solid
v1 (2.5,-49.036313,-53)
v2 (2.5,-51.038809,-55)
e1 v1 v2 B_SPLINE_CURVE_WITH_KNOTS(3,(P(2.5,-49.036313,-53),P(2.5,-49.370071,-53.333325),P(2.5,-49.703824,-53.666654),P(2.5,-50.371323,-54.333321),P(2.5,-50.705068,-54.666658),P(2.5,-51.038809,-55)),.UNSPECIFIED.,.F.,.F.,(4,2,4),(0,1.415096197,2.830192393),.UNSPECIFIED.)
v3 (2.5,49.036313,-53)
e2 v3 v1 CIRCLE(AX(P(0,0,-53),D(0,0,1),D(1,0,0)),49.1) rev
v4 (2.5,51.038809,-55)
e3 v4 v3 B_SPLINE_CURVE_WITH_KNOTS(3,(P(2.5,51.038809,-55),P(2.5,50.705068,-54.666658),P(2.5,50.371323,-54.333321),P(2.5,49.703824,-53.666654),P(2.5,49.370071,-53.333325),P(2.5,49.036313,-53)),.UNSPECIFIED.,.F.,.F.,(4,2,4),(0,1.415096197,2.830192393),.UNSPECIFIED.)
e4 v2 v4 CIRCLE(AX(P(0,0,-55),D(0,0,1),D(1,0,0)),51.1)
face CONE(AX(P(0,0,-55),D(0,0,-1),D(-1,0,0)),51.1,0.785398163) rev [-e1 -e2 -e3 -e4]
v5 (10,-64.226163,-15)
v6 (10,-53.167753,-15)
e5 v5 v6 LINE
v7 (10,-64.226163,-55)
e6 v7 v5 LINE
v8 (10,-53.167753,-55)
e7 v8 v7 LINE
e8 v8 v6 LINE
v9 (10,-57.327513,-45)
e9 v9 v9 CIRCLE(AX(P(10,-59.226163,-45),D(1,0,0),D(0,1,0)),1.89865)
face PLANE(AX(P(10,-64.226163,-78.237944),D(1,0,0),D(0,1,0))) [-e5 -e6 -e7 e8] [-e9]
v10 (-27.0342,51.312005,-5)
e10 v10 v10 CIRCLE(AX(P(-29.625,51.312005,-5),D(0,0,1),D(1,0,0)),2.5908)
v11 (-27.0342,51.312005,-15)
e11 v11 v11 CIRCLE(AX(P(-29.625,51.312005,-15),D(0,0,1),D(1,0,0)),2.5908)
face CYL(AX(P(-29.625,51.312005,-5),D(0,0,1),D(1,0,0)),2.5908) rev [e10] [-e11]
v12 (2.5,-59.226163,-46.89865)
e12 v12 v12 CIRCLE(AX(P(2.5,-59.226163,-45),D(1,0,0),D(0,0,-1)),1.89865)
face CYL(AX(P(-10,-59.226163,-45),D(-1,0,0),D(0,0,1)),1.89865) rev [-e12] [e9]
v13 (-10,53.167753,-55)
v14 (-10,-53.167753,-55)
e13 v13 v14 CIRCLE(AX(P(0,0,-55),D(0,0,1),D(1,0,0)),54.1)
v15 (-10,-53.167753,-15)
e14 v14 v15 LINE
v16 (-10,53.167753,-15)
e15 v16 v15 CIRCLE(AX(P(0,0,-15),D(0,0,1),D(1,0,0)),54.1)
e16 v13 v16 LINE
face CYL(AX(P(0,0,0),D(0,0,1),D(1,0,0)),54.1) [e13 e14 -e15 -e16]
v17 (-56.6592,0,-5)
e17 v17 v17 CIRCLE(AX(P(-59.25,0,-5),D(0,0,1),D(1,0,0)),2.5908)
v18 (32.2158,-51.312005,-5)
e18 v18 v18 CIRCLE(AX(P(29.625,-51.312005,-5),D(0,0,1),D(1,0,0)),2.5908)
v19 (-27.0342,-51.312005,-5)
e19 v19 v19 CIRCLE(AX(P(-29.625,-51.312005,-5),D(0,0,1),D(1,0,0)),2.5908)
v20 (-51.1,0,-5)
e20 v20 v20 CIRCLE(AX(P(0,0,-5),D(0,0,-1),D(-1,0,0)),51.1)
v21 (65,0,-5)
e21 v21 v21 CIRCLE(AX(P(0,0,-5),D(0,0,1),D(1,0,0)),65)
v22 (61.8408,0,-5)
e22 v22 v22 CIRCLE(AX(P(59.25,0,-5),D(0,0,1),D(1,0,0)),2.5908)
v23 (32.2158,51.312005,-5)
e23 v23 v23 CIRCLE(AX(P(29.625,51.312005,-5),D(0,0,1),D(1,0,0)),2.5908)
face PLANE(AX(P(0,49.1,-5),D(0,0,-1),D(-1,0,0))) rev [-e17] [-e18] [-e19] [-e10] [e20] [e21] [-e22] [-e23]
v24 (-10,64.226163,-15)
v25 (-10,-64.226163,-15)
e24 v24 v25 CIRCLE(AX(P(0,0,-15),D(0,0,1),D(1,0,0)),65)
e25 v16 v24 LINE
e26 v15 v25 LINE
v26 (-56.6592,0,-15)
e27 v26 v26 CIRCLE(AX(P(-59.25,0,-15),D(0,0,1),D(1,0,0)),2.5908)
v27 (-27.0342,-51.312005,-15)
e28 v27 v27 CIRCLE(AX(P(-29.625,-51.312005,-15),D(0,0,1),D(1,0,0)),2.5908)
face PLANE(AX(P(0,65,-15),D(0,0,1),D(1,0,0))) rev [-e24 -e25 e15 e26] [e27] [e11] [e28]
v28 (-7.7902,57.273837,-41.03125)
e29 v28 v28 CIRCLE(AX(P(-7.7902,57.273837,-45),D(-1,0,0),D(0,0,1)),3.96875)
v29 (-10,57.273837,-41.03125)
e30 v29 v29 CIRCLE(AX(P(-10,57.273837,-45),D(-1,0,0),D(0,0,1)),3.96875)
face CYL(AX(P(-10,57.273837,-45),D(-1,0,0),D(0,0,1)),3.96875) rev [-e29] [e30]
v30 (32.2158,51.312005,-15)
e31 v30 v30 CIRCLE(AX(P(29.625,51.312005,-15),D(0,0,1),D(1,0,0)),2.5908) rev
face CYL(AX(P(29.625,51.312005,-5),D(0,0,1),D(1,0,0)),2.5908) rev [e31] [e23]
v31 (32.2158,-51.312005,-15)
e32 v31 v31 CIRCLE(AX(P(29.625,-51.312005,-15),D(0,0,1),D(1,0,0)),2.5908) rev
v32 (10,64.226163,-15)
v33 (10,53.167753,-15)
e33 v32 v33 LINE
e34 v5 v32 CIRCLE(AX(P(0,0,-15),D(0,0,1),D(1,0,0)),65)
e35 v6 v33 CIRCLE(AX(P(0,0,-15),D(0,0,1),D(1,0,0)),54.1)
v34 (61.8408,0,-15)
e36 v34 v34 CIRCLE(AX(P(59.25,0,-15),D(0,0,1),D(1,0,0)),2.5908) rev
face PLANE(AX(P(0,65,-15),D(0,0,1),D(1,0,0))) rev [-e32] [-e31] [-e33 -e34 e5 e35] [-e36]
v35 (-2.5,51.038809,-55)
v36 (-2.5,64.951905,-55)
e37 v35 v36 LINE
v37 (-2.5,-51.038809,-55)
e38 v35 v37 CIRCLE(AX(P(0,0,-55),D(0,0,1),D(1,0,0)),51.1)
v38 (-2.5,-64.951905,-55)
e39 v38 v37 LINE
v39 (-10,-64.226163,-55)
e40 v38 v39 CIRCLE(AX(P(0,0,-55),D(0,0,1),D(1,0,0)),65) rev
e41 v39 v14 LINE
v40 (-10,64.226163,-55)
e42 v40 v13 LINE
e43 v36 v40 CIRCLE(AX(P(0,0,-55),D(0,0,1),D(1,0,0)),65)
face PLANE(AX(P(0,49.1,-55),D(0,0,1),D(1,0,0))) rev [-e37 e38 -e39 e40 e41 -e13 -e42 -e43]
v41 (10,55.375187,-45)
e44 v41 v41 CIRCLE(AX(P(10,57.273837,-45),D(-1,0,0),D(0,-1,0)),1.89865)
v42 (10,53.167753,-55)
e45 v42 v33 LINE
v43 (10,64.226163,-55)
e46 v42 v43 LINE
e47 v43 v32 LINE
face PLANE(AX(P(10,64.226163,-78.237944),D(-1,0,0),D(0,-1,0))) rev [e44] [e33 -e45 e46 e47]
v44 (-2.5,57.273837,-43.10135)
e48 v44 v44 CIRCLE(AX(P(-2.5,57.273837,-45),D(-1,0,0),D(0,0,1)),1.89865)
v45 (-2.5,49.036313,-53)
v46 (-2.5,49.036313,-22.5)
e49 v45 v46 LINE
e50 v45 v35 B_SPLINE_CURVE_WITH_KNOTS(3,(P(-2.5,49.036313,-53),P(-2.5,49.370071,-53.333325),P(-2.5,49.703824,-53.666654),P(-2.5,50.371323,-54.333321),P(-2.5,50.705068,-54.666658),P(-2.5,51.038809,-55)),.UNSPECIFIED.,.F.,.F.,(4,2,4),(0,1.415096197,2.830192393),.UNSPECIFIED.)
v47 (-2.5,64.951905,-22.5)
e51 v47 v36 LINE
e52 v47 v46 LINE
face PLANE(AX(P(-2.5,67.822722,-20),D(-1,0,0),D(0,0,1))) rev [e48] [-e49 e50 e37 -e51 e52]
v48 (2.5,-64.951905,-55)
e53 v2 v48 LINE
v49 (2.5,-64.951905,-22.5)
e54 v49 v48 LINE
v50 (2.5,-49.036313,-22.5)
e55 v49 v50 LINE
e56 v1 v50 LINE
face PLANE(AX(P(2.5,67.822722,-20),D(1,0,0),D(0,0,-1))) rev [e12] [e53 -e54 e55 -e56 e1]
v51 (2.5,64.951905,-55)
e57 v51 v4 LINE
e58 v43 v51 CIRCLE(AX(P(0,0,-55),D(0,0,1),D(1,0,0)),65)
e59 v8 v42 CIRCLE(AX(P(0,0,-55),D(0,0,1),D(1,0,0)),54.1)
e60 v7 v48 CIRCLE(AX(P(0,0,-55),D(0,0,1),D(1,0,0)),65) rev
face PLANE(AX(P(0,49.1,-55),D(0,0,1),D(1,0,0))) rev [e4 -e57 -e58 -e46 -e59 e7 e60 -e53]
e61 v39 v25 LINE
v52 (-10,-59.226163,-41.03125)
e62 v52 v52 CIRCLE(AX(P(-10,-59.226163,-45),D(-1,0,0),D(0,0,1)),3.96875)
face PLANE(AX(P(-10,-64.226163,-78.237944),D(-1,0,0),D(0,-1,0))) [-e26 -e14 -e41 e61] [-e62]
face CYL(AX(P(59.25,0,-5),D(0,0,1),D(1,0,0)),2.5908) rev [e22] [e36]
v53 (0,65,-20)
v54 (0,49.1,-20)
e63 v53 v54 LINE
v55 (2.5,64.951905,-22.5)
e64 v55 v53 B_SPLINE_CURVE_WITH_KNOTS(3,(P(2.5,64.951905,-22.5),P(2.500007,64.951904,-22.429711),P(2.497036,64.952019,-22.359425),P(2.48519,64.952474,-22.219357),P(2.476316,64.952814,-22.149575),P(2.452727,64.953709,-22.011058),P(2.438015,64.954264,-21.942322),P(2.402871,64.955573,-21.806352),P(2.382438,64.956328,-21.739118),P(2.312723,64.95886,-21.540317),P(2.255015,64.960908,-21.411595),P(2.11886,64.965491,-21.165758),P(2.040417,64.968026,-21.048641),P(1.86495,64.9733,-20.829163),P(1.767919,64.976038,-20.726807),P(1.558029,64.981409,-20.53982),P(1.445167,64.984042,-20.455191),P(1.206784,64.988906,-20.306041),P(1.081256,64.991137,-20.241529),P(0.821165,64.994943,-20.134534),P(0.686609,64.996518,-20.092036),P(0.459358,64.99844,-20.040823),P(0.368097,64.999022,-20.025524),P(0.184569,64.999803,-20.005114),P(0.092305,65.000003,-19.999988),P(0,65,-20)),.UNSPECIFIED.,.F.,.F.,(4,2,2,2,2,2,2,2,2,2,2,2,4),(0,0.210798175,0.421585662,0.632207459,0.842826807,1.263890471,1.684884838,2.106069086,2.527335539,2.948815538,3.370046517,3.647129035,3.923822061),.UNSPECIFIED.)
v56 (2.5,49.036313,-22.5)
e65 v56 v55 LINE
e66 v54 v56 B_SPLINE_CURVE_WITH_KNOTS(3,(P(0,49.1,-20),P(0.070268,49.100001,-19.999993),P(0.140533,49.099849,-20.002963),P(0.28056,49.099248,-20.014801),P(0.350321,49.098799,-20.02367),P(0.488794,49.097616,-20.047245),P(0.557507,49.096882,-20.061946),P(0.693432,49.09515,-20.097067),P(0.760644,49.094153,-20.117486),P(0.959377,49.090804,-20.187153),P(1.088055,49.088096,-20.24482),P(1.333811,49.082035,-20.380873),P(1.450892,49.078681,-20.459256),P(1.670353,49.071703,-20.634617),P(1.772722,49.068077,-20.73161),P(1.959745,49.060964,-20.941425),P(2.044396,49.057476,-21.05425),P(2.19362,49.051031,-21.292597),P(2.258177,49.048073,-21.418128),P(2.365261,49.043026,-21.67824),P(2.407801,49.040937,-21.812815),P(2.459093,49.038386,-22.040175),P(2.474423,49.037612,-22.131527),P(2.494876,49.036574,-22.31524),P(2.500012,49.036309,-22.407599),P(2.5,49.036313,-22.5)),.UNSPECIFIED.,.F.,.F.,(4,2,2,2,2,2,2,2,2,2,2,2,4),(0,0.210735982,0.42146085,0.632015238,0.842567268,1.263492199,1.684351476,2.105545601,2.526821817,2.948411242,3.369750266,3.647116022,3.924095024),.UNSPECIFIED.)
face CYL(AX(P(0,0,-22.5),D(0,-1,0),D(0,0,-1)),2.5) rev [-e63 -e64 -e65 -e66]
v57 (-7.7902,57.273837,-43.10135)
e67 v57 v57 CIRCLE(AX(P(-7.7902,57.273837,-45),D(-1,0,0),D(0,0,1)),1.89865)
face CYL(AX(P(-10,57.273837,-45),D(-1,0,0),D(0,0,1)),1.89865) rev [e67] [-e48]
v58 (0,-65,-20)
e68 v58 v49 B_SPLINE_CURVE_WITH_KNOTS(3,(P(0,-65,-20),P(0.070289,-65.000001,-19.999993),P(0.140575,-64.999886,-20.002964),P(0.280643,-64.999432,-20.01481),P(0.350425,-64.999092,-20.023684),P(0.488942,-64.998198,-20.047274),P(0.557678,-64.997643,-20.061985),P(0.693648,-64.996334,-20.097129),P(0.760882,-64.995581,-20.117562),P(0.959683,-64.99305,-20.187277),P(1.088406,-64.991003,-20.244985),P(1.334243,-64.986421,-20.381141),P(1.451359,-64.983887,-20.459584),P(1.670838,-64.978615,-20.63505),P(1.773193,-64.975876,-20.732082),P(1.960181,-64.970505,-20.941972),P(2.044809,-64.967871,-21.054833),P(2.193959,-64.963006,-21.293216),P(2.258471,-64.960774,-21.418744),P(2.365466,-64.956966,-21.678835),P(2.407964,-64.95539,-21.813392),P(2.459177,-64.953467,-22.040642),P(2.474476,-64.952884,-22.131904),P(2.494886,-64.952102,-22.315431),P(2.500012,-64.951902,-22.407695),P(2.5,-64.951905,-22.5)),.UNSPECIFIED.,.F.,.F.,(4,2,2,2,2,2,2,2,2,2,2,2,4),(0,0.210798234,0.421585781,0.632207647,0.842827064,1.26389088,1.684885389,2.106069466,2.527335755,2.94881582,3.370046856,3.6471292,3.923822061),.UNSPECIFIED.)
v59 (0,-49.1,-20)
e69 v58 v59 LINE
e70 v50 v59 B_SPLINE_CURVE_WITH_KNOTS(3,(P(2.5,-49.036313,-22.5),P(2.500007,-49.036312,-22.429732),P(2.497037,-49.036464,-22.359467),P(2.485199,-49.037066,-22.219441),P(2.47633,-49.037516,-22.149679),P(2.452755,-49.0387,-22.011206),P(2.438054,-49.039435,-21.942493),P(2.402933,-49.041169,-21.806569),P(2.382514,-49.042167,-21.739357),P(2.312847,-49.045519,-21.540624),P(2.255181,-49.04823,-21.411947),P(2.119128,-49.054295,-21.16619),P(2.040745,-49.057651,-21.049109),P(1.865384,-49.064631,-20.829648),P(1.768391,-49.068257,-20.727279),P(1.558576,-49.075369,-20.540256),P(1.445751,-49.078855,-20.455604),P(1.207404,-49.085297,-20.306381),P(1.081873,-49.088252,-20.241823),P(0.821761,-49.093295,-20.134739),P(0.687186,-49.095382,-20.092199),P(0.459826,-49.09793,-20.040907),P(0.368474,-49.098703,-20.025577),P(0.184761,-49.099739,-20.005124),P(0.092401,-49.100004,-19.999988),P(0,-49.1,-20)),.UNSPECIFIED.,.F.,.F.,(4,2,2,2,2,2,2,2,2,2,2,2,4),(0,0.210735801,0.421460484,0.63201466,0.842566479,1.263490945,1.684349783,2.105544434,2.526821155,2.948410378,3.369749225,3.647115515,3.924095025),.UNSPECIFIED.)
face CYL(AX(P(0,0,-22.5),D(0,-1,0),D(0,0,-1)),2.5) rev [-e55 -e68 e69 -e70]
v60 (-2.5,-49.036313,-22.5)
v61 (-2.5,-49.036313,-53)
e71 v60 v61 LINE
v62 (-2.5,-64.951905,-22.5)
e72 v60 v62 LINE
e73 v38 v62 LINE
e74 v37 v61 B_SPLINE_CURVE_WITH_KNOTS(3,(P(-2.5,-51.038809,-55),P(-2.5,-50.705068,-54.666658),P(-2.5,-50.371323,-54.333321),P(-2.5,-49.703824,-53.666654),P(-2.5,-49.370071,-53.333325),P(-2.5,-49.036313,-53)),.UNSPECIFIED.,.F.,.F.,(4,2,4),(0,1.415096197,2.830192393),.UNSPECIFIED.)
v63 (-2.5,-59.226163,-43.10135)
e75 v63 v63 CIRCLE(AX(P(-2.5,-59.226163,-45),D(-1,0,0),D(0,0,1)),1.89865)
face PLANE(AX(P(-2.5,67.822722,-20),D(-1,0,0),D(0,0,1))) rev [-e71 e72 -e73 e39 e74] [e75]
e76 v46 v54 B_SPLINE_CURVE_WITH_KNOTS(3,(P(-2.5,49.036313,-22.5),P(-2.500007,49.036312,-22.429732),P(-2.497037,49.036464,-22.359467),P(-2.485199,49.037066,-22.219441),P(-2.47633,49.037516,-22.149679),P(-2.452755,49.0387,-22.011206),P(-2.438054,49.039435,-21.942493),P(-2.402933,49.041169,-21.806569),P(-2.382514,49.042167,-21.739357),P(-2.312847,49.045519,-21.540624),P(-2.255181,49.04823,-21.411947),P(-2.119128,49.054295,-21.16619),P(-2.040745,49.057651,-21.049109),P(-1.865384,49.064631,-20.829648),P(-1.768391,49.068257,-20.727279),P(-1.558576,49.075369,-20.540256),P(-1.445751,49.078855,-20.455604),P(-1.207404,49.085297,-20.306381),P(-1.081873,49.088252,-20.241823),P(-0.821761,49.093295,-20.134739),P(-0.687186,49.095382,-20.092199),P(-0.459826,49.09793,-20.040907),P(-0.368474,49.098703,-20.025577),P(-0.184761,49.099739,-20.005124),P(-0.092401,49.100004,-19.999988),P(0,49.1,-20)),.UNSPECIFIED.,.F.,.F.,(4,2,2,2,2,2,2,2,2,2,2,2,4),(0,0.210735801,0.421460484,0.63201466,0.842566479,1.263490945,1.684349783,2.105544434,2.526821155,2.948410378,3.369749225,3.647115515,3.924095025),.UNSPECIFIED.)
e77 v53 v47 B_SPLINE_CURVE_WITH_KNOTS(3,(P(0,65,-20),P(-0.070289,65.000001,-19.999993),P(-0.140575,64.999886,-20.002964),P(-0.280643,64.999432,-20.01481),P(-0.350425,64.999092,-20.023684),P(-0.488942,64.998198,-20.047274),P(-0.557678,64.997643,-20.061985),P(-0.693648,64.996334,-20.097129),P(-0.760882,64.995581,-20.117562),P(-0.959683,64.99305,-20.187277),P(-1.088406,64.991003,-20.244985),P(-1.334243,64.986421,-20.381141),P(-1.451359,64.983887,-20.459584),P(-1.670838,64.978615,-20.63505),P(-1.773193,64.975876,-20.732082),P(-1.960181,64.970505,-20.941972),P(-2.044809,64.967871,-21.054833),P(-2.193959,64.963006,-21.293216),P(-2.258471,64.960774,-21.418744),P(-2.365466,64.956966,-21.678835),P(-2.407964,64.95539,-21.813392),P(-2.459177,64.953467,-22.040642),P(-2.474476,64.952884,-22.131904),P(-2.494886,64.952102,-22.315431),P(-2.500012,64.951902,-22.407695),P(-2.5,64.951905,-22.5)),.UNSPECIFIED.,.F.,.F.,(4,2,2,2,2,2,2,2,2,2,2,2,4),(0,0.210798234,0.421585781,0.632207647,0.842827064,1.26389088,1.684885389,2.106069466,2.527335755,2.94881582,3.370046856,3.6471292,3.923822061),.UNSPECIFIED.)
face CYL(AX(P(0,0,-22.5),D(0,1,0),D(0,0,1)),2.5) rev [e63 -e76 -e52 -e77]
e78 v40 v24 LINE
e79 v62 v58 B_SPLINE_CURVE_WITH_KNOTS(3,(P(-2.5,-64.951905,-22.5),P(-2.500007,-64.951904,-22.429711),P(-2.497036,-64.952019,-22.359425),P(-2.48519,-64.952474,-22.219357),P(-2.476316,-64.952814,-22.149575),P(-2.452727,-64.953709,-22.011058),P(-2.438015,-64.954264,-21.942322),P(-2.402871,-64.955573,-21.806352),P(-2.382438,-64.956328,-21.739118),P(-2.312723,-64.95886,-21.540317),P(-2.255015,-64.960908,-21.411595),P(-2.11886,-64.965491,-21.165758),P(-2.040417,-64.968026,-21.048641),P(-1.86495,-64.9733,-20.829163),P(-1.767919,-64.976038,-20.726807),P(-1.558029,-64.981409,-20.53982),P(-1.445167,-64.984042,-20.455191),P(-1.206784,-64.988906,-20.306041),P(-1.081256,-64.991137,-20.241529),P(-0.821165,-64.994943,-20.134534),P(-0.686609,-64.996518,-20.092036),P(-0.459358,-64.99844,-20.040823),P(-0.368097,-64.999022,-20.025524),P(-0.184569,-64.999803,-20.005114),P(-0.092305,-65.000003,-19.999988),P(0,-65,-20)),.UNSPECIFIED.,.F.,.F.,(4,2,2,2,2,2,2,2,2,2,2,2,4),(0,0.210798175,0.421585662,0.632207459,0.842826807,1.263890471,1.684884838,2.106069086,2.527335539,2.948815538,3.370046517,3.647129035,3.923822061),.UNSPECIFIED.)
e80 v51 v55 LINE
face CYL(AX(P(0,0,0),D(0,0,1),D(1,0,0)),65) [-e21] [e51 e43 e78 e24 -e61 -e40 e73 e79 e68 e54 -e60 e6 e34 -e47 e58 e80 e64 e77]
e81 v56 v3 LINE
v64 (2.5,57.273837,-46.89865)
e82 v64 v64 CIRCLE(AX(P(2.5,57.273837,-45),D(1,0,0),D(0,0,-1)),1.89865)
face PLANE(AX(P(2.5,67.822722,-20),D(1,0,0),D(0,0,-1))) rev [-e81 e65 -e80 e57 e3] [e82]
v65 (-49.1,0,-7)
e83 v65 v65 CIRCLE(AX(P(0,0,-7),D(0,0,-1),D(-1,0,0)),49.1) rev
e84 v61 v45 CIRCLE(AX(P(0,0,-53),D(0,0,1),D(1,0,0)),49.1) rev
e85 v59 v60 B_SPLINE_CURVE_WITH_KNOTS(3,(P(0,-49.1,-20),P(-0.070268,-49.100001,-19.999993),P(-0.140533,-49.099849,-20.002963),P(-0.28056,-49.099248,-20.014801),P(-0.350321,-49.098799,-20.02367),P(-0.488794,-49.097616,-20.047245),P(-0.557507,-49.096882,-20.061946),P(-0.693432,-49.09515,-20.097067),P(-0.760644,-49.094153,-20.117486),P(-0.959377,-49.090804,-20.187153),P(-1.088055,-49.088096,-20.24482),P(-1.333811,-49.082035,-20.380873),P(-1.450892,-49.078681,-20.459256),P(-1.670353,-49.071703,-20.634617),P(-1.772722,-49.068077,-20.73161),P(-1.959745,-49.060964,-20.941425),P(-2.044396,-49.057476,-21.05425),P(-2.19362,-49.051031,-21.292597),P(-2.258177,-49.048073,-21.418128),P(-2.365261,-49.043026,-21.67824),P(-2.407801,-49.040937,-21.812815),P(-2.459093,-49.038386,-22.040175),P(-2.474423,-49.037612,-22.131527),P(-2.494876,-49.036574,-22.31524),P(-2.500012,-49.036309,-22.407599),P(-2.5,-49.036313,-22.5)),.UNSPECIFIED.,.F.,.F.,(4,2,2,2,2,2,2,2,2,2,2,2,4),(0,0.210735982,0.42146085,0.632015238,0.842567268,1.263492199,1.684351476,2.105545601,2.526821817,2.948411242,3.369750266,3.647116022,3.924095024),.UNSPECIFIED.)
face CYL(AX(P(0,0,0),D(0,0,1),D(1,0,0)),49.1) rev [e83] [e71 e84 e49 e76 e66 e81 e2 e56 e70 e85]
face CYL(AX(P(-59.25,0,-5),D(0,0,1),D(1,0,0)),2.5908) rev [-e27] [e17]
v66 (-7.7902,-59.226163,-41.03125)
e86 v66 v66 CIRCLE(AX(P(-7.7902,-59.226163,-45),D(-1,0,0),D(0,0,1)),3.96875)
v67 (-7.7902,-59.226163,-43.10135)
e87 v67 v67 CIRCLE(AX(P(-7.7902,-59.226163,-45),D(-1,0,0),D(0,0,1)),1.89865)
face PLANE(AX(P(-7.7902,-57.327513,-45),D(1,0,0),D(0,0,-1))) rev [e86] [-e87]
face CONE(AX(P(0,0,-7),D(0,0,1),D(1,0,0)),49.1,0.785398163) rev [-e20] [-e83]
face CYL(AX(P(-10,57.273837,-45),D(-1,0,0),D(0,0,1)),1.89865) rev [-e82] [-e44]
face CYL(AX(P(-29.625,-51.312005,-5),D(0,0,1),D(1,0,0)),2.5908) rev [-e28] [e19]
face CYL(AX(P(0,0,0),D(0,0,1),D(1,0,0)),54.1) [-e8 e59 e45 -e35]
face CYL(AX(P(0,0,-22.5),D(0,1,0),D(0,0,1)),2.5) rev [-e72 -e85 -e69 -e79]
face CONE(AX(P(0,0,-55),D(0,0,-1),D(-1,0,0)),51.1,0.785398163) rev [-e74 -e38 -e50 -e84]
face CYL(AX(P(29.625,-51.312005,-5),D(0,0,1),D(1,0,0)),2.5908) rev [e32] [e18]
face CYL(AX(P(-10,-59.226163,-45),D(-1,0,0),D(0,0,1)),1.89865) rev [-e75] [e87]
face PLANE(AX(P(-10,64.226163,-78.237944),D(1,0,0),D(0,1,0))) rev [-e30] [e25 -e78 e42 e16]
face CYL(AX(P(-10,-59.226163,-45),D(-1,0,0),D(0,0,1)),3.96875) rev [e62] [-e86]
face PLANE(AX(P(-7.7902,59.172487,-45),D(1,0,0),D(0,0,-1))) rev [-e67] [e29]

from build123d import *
from build123d.topology import SkipClean

# Parameters (mm, degrees)
BOSS_EXTRUDE1_DEPTH        = 40
SKETCH3_W                  = 5
SKETCH3_H                  = 136
CUT_EXTRUDE1_DEPTH         = 35
FILLET1_R                  = 2.5
CHAMFER1_SIZE              = 2
CHAMFER2_SIZE              = 2
F_6_0_204_DIAMETER_HOLE1_D = 5.1816
CIRPATTERN1_COUNT          = 6
LPATTERN1_COUNT            = 2
LPATTERN1_PITCH            = 116.5


with BuildPart() as part:
    # Sketch1 → Revolve1 (revolve)
    with BuildSketch(Plane(origin=(0, 0, 0), x_dir=(0, 0, -1), z_dir=(1, 0, 0)), mode=Mode.PRIVATE) as revolve1_sk:
        Polygon((5, 49.1), (55, 49.1), (55, 54.1), (15, 54.1), (15, 65), (5, 65), align=None)
    revolve(revolve1_sk.sketch.rotate(Axis((0, 0, 0), (0, 0, -1)), 90), axis=Axis((0, 0, 0), (0, 0, -1)))

    # Sketch2 → Boss-Extrude1 (add)
    with BuildSketch(Plane(origin=(0, 0, -15), x_dir=(-1, 0, 0), z_dir=(0, 0, -1))):
        with BuildLine():
            Line((-10, 64.226162893), (-10, 53.167753385))
            ThreePointArc((-10, 53.167753385), (0, 54.1), (10, 53.167753385))
            Line((10, 53.167753385), (10, 64.226162893))
            ThreePointArc((10, 64.226162893), (0, 65), (-10, 64.226162893))
        make_face()
    boss_extrude1 = extrude(amount=BOSS_EXTRUDE1_DEPTH)

    # Mirror1: Boss-Extrude1 across plane
    with SkipClean():  # the faces are left unmerged after this step: merging them gives an invalid solid
        add(boss_extrude1.mirror(Plane.ZX))

    # Sketch3 → Cut-Extrude1 (cut)
    with BuildSketch(Plane(origin=(0, 0, -55), x_dir=(-1, 0, 0), z_dir=(0, 0, -1))):
        with Locations((0, -0.177278441)):
            Rectangle(SKETCH3_W, SKETCH3_H)
    extrude(amount=-CUT_EXTRUDE1_DEPTH, mode=Mode.SUBTRACT)

    # Fillet1
    # the kernel refuses this fillet: 2.5 mm, written as the material it adds along each edge
    with BuildSketch(Plane(origin=(2.5, -71.201905284, -20), x_dir=(-1, 0, 0), z_dir=(0, 1, 0))) as fillet1_piece_1_section:
        with BuildLine():
            CenterArc((FILLET1_R, -FILLET1_R), FILLET1_R, 90, 90)
            Line((0, -FILLET1_R), (0, 0))
            Line((0, 0), (FILLET1_R, 0))
        make_face()
    fillet1_piece_1 = extrude(amount=28.415592209, mode=Mode.PRIVATE)
    fillet1_piece_1 = fillet1_piece_1 - Plane(origin=(0, 0, -20.566080782), x_dir=(1, 0, 0), z_dir=(0, 0, -1)) * Cylinder(49.1, 67, mode=Mode.PRIVATE)
    fillet1_piece_1 = fillet1_piece_1 & Plane(origin=(0, 0, -20.566080782), x_dir=(-0.15384615384615422, -0.9880948137434714, 0), z_dir=(0, 0, 1)) * Cylinder(65, 67, mode=Mode.PRIVATE)
    with BuildSketch(Plane(origin=(2.5, 42.786313075, -20), x_dir=(0, 0, -1), z_dir=(0, 1, 0))) as fillet1_piece_2_section:
        with BuildLine():
            CenterArc((FILLET1_R, FILLET1_R), FILLET1_R, 180, 90)
            Line((0, FILLET1_R), (0, 0))
            Line((0, 0), (FILLET1_R, 0))
        make_face()
    fillet1_piece_2 = extrude(amount=28.415592209, mode=Mode.PRIVATE)
    fillet1_piece_2 = fillet1_piece_2 - Plane(origin=(0, 0, -20.566075474), x_dir=(1, 0, 0), z_dir=(0, 0, -1)) * Cylinder(49.1, 67, mode=Mode.PRIVATE)
    fillet1_piece_2 = fillet1_piece_2 & Plane(origin=(0, 0, -20.566075474), x_dir=(1, 0, 0), z_dir=(0, 0, 1)) * Cylinder(65, 67, mode=Mode.PRIVATE)
    with BuildSketch(Plane(origin=(-2.5, -42.786313075, -20), x_dir=(0, 0, -1), z_dir=(0, -1, 0))) as fillet1_piece_3_section:
        with BuildLine():
            CenterArc((FILLET1_R, FILLET1_R), FILLET1_R, 180, 90)
            Line((0, FILLET1_R), (0, 0))
            Line((0, 0), (FILLET1_R, 0))
        make_face()
    fillet1_piece_3 = extrude(amount=28.415592209, mode=Mode.PRIVATE)
    fillet1_piece_3 = fillet1_piece_3 - Plane(origin=(0, 0, -20.566082494), x_dir=(1, 0, 0), z_dir=(0, 0, -1)) * Cylinder(49.1, 67, mode=Mode.PRIVATE)
    fillet1_piece_3 = fillet1_piece_3 & Plane(origin=(0, 0, -20.566082494), x_dir=(-0.15384615384615422, -0.9880948137434714, 0), z_dir=(0, 0, 1)) * Cylinder(65, 67, mode=Mode.PRIVATE)
    with BuildSketch(Plane(origin=(-2.5, 71.201905284, -20), x_dir=(1, 0, 0), z_dir=(0, -1, 0))) as fillet1_piece_4_section:
        with BuildLine():
            CenterArc((FILLET1_R, -FILLET1_R), FILLET1_R, 90, 90)
            Line((0, -FILLET1_R), (0, 0))
            Line((0, 0), (FILLET1_R, 0))
        make_face()
    fillet1_piece_4 = extrude(amount=28.415592209, mode=Mode.PRIVATE)
    fillet1_piece_4 = fillet1_piece_4 - Plane(origin=(0, 0, -20.566085883), x_dir=(1, 0, 0), z_dir=(0, 0, -1)) * Cylinder(49.1, 67, mode=Mode.PRIVATE)
    fillet1_piece_4 = fillet1_piece_4 & Plane(origin=(0, 0, -20.566085883), x_dir=(1, 0, 0), z_dir=(0, 0, 1)) * Cylinder(65, 67, mode=Mode.PRIVATE)
    add([fillet1_piece_1, fillet1_piece_2, fillet1_piece_3, fillet1_piece_4])

    # Chamfer1
    chamfer1_edges = [part.edges().sort_by_distance(p)[0] for p in [
        (-49.1, 0, -55),
        (35.591853, -33.823512532, -55),
    ]]
    chamfer(chamfer1_edges, length=CHAMFER1_SIZE)

    # Chamfer2
    chamfer2_edges = [part.edges().sort_by_distance(p)[0] for p in [
        (-49.1, 0, -5),
    ]]
    chamfer(chamfer2_edges, length=CHAMFER2_SIZE)

    # #6 (0.204) Diameter Hole1 (through all)
    with Locations(Plane.XY.offset(-5)):
        with Locations((-29.625, 51.312005174)):
            f_6_0_204_diameter_hole1 = Hole(F_6_0_204_DIAMETER_HOLE1_D / 2)

    # CirPattern1: #6 (0.204) Diameter Hole1 ×6 about axis
    with SkipClean():  # the faces are left unmerged after this step: merging them gives an invalid solid
        cirpattern1_axis = Axis((0, 0, 0), (0, 0, 1))
        for i in range(1, CIRPATTERN1_COUNT):
            add(f_6_0_204_diameter_hole1.rotate(cirpattern1_axis, i * 360 / CIRPATTERN1_COUNT), mode=Mode.SUBTRACT)

    # Sketch8 → CBORE for #6 Binding Head Machine Screw1 (revolve, cut)
    with SkipClean():  # the faces are left unmerged after this step: merging them gives an invalid solid
        with BuildSketch(Plane(origin=(-10, -59.226162893, -45), x_dir=(0, 0, 1), z_dir=(0, 1, 0))):
            Polygon((0, 0), (0, 26.140824014), (1.89865, 25), (1.89865, 2.2098), (3.96875, 2.2098), (3.96875, 0), align=None)
        cbore_for_6_binding_head_machine_screw1 = revolve(axis=Axis((-16.35, -59.226162893, -45), (1, 0, 0)), mode=Mode.SUBTRACT)

    # LPattern1: CBORE for #6 Binding Head Machine Screw1 ×2
    with SkipClean():  # the faces are left unmerged after this step: merging them gives an invalid solid
        with Locations(*[(0, i * LPATTERN1_PITCH, 0) for i in range(1, LPATTERN1_COUNT)]):
            add(cbore_for_6_binding_head_machine_screw1, mode=Mode.SUBTRACT)


solid = part.part
